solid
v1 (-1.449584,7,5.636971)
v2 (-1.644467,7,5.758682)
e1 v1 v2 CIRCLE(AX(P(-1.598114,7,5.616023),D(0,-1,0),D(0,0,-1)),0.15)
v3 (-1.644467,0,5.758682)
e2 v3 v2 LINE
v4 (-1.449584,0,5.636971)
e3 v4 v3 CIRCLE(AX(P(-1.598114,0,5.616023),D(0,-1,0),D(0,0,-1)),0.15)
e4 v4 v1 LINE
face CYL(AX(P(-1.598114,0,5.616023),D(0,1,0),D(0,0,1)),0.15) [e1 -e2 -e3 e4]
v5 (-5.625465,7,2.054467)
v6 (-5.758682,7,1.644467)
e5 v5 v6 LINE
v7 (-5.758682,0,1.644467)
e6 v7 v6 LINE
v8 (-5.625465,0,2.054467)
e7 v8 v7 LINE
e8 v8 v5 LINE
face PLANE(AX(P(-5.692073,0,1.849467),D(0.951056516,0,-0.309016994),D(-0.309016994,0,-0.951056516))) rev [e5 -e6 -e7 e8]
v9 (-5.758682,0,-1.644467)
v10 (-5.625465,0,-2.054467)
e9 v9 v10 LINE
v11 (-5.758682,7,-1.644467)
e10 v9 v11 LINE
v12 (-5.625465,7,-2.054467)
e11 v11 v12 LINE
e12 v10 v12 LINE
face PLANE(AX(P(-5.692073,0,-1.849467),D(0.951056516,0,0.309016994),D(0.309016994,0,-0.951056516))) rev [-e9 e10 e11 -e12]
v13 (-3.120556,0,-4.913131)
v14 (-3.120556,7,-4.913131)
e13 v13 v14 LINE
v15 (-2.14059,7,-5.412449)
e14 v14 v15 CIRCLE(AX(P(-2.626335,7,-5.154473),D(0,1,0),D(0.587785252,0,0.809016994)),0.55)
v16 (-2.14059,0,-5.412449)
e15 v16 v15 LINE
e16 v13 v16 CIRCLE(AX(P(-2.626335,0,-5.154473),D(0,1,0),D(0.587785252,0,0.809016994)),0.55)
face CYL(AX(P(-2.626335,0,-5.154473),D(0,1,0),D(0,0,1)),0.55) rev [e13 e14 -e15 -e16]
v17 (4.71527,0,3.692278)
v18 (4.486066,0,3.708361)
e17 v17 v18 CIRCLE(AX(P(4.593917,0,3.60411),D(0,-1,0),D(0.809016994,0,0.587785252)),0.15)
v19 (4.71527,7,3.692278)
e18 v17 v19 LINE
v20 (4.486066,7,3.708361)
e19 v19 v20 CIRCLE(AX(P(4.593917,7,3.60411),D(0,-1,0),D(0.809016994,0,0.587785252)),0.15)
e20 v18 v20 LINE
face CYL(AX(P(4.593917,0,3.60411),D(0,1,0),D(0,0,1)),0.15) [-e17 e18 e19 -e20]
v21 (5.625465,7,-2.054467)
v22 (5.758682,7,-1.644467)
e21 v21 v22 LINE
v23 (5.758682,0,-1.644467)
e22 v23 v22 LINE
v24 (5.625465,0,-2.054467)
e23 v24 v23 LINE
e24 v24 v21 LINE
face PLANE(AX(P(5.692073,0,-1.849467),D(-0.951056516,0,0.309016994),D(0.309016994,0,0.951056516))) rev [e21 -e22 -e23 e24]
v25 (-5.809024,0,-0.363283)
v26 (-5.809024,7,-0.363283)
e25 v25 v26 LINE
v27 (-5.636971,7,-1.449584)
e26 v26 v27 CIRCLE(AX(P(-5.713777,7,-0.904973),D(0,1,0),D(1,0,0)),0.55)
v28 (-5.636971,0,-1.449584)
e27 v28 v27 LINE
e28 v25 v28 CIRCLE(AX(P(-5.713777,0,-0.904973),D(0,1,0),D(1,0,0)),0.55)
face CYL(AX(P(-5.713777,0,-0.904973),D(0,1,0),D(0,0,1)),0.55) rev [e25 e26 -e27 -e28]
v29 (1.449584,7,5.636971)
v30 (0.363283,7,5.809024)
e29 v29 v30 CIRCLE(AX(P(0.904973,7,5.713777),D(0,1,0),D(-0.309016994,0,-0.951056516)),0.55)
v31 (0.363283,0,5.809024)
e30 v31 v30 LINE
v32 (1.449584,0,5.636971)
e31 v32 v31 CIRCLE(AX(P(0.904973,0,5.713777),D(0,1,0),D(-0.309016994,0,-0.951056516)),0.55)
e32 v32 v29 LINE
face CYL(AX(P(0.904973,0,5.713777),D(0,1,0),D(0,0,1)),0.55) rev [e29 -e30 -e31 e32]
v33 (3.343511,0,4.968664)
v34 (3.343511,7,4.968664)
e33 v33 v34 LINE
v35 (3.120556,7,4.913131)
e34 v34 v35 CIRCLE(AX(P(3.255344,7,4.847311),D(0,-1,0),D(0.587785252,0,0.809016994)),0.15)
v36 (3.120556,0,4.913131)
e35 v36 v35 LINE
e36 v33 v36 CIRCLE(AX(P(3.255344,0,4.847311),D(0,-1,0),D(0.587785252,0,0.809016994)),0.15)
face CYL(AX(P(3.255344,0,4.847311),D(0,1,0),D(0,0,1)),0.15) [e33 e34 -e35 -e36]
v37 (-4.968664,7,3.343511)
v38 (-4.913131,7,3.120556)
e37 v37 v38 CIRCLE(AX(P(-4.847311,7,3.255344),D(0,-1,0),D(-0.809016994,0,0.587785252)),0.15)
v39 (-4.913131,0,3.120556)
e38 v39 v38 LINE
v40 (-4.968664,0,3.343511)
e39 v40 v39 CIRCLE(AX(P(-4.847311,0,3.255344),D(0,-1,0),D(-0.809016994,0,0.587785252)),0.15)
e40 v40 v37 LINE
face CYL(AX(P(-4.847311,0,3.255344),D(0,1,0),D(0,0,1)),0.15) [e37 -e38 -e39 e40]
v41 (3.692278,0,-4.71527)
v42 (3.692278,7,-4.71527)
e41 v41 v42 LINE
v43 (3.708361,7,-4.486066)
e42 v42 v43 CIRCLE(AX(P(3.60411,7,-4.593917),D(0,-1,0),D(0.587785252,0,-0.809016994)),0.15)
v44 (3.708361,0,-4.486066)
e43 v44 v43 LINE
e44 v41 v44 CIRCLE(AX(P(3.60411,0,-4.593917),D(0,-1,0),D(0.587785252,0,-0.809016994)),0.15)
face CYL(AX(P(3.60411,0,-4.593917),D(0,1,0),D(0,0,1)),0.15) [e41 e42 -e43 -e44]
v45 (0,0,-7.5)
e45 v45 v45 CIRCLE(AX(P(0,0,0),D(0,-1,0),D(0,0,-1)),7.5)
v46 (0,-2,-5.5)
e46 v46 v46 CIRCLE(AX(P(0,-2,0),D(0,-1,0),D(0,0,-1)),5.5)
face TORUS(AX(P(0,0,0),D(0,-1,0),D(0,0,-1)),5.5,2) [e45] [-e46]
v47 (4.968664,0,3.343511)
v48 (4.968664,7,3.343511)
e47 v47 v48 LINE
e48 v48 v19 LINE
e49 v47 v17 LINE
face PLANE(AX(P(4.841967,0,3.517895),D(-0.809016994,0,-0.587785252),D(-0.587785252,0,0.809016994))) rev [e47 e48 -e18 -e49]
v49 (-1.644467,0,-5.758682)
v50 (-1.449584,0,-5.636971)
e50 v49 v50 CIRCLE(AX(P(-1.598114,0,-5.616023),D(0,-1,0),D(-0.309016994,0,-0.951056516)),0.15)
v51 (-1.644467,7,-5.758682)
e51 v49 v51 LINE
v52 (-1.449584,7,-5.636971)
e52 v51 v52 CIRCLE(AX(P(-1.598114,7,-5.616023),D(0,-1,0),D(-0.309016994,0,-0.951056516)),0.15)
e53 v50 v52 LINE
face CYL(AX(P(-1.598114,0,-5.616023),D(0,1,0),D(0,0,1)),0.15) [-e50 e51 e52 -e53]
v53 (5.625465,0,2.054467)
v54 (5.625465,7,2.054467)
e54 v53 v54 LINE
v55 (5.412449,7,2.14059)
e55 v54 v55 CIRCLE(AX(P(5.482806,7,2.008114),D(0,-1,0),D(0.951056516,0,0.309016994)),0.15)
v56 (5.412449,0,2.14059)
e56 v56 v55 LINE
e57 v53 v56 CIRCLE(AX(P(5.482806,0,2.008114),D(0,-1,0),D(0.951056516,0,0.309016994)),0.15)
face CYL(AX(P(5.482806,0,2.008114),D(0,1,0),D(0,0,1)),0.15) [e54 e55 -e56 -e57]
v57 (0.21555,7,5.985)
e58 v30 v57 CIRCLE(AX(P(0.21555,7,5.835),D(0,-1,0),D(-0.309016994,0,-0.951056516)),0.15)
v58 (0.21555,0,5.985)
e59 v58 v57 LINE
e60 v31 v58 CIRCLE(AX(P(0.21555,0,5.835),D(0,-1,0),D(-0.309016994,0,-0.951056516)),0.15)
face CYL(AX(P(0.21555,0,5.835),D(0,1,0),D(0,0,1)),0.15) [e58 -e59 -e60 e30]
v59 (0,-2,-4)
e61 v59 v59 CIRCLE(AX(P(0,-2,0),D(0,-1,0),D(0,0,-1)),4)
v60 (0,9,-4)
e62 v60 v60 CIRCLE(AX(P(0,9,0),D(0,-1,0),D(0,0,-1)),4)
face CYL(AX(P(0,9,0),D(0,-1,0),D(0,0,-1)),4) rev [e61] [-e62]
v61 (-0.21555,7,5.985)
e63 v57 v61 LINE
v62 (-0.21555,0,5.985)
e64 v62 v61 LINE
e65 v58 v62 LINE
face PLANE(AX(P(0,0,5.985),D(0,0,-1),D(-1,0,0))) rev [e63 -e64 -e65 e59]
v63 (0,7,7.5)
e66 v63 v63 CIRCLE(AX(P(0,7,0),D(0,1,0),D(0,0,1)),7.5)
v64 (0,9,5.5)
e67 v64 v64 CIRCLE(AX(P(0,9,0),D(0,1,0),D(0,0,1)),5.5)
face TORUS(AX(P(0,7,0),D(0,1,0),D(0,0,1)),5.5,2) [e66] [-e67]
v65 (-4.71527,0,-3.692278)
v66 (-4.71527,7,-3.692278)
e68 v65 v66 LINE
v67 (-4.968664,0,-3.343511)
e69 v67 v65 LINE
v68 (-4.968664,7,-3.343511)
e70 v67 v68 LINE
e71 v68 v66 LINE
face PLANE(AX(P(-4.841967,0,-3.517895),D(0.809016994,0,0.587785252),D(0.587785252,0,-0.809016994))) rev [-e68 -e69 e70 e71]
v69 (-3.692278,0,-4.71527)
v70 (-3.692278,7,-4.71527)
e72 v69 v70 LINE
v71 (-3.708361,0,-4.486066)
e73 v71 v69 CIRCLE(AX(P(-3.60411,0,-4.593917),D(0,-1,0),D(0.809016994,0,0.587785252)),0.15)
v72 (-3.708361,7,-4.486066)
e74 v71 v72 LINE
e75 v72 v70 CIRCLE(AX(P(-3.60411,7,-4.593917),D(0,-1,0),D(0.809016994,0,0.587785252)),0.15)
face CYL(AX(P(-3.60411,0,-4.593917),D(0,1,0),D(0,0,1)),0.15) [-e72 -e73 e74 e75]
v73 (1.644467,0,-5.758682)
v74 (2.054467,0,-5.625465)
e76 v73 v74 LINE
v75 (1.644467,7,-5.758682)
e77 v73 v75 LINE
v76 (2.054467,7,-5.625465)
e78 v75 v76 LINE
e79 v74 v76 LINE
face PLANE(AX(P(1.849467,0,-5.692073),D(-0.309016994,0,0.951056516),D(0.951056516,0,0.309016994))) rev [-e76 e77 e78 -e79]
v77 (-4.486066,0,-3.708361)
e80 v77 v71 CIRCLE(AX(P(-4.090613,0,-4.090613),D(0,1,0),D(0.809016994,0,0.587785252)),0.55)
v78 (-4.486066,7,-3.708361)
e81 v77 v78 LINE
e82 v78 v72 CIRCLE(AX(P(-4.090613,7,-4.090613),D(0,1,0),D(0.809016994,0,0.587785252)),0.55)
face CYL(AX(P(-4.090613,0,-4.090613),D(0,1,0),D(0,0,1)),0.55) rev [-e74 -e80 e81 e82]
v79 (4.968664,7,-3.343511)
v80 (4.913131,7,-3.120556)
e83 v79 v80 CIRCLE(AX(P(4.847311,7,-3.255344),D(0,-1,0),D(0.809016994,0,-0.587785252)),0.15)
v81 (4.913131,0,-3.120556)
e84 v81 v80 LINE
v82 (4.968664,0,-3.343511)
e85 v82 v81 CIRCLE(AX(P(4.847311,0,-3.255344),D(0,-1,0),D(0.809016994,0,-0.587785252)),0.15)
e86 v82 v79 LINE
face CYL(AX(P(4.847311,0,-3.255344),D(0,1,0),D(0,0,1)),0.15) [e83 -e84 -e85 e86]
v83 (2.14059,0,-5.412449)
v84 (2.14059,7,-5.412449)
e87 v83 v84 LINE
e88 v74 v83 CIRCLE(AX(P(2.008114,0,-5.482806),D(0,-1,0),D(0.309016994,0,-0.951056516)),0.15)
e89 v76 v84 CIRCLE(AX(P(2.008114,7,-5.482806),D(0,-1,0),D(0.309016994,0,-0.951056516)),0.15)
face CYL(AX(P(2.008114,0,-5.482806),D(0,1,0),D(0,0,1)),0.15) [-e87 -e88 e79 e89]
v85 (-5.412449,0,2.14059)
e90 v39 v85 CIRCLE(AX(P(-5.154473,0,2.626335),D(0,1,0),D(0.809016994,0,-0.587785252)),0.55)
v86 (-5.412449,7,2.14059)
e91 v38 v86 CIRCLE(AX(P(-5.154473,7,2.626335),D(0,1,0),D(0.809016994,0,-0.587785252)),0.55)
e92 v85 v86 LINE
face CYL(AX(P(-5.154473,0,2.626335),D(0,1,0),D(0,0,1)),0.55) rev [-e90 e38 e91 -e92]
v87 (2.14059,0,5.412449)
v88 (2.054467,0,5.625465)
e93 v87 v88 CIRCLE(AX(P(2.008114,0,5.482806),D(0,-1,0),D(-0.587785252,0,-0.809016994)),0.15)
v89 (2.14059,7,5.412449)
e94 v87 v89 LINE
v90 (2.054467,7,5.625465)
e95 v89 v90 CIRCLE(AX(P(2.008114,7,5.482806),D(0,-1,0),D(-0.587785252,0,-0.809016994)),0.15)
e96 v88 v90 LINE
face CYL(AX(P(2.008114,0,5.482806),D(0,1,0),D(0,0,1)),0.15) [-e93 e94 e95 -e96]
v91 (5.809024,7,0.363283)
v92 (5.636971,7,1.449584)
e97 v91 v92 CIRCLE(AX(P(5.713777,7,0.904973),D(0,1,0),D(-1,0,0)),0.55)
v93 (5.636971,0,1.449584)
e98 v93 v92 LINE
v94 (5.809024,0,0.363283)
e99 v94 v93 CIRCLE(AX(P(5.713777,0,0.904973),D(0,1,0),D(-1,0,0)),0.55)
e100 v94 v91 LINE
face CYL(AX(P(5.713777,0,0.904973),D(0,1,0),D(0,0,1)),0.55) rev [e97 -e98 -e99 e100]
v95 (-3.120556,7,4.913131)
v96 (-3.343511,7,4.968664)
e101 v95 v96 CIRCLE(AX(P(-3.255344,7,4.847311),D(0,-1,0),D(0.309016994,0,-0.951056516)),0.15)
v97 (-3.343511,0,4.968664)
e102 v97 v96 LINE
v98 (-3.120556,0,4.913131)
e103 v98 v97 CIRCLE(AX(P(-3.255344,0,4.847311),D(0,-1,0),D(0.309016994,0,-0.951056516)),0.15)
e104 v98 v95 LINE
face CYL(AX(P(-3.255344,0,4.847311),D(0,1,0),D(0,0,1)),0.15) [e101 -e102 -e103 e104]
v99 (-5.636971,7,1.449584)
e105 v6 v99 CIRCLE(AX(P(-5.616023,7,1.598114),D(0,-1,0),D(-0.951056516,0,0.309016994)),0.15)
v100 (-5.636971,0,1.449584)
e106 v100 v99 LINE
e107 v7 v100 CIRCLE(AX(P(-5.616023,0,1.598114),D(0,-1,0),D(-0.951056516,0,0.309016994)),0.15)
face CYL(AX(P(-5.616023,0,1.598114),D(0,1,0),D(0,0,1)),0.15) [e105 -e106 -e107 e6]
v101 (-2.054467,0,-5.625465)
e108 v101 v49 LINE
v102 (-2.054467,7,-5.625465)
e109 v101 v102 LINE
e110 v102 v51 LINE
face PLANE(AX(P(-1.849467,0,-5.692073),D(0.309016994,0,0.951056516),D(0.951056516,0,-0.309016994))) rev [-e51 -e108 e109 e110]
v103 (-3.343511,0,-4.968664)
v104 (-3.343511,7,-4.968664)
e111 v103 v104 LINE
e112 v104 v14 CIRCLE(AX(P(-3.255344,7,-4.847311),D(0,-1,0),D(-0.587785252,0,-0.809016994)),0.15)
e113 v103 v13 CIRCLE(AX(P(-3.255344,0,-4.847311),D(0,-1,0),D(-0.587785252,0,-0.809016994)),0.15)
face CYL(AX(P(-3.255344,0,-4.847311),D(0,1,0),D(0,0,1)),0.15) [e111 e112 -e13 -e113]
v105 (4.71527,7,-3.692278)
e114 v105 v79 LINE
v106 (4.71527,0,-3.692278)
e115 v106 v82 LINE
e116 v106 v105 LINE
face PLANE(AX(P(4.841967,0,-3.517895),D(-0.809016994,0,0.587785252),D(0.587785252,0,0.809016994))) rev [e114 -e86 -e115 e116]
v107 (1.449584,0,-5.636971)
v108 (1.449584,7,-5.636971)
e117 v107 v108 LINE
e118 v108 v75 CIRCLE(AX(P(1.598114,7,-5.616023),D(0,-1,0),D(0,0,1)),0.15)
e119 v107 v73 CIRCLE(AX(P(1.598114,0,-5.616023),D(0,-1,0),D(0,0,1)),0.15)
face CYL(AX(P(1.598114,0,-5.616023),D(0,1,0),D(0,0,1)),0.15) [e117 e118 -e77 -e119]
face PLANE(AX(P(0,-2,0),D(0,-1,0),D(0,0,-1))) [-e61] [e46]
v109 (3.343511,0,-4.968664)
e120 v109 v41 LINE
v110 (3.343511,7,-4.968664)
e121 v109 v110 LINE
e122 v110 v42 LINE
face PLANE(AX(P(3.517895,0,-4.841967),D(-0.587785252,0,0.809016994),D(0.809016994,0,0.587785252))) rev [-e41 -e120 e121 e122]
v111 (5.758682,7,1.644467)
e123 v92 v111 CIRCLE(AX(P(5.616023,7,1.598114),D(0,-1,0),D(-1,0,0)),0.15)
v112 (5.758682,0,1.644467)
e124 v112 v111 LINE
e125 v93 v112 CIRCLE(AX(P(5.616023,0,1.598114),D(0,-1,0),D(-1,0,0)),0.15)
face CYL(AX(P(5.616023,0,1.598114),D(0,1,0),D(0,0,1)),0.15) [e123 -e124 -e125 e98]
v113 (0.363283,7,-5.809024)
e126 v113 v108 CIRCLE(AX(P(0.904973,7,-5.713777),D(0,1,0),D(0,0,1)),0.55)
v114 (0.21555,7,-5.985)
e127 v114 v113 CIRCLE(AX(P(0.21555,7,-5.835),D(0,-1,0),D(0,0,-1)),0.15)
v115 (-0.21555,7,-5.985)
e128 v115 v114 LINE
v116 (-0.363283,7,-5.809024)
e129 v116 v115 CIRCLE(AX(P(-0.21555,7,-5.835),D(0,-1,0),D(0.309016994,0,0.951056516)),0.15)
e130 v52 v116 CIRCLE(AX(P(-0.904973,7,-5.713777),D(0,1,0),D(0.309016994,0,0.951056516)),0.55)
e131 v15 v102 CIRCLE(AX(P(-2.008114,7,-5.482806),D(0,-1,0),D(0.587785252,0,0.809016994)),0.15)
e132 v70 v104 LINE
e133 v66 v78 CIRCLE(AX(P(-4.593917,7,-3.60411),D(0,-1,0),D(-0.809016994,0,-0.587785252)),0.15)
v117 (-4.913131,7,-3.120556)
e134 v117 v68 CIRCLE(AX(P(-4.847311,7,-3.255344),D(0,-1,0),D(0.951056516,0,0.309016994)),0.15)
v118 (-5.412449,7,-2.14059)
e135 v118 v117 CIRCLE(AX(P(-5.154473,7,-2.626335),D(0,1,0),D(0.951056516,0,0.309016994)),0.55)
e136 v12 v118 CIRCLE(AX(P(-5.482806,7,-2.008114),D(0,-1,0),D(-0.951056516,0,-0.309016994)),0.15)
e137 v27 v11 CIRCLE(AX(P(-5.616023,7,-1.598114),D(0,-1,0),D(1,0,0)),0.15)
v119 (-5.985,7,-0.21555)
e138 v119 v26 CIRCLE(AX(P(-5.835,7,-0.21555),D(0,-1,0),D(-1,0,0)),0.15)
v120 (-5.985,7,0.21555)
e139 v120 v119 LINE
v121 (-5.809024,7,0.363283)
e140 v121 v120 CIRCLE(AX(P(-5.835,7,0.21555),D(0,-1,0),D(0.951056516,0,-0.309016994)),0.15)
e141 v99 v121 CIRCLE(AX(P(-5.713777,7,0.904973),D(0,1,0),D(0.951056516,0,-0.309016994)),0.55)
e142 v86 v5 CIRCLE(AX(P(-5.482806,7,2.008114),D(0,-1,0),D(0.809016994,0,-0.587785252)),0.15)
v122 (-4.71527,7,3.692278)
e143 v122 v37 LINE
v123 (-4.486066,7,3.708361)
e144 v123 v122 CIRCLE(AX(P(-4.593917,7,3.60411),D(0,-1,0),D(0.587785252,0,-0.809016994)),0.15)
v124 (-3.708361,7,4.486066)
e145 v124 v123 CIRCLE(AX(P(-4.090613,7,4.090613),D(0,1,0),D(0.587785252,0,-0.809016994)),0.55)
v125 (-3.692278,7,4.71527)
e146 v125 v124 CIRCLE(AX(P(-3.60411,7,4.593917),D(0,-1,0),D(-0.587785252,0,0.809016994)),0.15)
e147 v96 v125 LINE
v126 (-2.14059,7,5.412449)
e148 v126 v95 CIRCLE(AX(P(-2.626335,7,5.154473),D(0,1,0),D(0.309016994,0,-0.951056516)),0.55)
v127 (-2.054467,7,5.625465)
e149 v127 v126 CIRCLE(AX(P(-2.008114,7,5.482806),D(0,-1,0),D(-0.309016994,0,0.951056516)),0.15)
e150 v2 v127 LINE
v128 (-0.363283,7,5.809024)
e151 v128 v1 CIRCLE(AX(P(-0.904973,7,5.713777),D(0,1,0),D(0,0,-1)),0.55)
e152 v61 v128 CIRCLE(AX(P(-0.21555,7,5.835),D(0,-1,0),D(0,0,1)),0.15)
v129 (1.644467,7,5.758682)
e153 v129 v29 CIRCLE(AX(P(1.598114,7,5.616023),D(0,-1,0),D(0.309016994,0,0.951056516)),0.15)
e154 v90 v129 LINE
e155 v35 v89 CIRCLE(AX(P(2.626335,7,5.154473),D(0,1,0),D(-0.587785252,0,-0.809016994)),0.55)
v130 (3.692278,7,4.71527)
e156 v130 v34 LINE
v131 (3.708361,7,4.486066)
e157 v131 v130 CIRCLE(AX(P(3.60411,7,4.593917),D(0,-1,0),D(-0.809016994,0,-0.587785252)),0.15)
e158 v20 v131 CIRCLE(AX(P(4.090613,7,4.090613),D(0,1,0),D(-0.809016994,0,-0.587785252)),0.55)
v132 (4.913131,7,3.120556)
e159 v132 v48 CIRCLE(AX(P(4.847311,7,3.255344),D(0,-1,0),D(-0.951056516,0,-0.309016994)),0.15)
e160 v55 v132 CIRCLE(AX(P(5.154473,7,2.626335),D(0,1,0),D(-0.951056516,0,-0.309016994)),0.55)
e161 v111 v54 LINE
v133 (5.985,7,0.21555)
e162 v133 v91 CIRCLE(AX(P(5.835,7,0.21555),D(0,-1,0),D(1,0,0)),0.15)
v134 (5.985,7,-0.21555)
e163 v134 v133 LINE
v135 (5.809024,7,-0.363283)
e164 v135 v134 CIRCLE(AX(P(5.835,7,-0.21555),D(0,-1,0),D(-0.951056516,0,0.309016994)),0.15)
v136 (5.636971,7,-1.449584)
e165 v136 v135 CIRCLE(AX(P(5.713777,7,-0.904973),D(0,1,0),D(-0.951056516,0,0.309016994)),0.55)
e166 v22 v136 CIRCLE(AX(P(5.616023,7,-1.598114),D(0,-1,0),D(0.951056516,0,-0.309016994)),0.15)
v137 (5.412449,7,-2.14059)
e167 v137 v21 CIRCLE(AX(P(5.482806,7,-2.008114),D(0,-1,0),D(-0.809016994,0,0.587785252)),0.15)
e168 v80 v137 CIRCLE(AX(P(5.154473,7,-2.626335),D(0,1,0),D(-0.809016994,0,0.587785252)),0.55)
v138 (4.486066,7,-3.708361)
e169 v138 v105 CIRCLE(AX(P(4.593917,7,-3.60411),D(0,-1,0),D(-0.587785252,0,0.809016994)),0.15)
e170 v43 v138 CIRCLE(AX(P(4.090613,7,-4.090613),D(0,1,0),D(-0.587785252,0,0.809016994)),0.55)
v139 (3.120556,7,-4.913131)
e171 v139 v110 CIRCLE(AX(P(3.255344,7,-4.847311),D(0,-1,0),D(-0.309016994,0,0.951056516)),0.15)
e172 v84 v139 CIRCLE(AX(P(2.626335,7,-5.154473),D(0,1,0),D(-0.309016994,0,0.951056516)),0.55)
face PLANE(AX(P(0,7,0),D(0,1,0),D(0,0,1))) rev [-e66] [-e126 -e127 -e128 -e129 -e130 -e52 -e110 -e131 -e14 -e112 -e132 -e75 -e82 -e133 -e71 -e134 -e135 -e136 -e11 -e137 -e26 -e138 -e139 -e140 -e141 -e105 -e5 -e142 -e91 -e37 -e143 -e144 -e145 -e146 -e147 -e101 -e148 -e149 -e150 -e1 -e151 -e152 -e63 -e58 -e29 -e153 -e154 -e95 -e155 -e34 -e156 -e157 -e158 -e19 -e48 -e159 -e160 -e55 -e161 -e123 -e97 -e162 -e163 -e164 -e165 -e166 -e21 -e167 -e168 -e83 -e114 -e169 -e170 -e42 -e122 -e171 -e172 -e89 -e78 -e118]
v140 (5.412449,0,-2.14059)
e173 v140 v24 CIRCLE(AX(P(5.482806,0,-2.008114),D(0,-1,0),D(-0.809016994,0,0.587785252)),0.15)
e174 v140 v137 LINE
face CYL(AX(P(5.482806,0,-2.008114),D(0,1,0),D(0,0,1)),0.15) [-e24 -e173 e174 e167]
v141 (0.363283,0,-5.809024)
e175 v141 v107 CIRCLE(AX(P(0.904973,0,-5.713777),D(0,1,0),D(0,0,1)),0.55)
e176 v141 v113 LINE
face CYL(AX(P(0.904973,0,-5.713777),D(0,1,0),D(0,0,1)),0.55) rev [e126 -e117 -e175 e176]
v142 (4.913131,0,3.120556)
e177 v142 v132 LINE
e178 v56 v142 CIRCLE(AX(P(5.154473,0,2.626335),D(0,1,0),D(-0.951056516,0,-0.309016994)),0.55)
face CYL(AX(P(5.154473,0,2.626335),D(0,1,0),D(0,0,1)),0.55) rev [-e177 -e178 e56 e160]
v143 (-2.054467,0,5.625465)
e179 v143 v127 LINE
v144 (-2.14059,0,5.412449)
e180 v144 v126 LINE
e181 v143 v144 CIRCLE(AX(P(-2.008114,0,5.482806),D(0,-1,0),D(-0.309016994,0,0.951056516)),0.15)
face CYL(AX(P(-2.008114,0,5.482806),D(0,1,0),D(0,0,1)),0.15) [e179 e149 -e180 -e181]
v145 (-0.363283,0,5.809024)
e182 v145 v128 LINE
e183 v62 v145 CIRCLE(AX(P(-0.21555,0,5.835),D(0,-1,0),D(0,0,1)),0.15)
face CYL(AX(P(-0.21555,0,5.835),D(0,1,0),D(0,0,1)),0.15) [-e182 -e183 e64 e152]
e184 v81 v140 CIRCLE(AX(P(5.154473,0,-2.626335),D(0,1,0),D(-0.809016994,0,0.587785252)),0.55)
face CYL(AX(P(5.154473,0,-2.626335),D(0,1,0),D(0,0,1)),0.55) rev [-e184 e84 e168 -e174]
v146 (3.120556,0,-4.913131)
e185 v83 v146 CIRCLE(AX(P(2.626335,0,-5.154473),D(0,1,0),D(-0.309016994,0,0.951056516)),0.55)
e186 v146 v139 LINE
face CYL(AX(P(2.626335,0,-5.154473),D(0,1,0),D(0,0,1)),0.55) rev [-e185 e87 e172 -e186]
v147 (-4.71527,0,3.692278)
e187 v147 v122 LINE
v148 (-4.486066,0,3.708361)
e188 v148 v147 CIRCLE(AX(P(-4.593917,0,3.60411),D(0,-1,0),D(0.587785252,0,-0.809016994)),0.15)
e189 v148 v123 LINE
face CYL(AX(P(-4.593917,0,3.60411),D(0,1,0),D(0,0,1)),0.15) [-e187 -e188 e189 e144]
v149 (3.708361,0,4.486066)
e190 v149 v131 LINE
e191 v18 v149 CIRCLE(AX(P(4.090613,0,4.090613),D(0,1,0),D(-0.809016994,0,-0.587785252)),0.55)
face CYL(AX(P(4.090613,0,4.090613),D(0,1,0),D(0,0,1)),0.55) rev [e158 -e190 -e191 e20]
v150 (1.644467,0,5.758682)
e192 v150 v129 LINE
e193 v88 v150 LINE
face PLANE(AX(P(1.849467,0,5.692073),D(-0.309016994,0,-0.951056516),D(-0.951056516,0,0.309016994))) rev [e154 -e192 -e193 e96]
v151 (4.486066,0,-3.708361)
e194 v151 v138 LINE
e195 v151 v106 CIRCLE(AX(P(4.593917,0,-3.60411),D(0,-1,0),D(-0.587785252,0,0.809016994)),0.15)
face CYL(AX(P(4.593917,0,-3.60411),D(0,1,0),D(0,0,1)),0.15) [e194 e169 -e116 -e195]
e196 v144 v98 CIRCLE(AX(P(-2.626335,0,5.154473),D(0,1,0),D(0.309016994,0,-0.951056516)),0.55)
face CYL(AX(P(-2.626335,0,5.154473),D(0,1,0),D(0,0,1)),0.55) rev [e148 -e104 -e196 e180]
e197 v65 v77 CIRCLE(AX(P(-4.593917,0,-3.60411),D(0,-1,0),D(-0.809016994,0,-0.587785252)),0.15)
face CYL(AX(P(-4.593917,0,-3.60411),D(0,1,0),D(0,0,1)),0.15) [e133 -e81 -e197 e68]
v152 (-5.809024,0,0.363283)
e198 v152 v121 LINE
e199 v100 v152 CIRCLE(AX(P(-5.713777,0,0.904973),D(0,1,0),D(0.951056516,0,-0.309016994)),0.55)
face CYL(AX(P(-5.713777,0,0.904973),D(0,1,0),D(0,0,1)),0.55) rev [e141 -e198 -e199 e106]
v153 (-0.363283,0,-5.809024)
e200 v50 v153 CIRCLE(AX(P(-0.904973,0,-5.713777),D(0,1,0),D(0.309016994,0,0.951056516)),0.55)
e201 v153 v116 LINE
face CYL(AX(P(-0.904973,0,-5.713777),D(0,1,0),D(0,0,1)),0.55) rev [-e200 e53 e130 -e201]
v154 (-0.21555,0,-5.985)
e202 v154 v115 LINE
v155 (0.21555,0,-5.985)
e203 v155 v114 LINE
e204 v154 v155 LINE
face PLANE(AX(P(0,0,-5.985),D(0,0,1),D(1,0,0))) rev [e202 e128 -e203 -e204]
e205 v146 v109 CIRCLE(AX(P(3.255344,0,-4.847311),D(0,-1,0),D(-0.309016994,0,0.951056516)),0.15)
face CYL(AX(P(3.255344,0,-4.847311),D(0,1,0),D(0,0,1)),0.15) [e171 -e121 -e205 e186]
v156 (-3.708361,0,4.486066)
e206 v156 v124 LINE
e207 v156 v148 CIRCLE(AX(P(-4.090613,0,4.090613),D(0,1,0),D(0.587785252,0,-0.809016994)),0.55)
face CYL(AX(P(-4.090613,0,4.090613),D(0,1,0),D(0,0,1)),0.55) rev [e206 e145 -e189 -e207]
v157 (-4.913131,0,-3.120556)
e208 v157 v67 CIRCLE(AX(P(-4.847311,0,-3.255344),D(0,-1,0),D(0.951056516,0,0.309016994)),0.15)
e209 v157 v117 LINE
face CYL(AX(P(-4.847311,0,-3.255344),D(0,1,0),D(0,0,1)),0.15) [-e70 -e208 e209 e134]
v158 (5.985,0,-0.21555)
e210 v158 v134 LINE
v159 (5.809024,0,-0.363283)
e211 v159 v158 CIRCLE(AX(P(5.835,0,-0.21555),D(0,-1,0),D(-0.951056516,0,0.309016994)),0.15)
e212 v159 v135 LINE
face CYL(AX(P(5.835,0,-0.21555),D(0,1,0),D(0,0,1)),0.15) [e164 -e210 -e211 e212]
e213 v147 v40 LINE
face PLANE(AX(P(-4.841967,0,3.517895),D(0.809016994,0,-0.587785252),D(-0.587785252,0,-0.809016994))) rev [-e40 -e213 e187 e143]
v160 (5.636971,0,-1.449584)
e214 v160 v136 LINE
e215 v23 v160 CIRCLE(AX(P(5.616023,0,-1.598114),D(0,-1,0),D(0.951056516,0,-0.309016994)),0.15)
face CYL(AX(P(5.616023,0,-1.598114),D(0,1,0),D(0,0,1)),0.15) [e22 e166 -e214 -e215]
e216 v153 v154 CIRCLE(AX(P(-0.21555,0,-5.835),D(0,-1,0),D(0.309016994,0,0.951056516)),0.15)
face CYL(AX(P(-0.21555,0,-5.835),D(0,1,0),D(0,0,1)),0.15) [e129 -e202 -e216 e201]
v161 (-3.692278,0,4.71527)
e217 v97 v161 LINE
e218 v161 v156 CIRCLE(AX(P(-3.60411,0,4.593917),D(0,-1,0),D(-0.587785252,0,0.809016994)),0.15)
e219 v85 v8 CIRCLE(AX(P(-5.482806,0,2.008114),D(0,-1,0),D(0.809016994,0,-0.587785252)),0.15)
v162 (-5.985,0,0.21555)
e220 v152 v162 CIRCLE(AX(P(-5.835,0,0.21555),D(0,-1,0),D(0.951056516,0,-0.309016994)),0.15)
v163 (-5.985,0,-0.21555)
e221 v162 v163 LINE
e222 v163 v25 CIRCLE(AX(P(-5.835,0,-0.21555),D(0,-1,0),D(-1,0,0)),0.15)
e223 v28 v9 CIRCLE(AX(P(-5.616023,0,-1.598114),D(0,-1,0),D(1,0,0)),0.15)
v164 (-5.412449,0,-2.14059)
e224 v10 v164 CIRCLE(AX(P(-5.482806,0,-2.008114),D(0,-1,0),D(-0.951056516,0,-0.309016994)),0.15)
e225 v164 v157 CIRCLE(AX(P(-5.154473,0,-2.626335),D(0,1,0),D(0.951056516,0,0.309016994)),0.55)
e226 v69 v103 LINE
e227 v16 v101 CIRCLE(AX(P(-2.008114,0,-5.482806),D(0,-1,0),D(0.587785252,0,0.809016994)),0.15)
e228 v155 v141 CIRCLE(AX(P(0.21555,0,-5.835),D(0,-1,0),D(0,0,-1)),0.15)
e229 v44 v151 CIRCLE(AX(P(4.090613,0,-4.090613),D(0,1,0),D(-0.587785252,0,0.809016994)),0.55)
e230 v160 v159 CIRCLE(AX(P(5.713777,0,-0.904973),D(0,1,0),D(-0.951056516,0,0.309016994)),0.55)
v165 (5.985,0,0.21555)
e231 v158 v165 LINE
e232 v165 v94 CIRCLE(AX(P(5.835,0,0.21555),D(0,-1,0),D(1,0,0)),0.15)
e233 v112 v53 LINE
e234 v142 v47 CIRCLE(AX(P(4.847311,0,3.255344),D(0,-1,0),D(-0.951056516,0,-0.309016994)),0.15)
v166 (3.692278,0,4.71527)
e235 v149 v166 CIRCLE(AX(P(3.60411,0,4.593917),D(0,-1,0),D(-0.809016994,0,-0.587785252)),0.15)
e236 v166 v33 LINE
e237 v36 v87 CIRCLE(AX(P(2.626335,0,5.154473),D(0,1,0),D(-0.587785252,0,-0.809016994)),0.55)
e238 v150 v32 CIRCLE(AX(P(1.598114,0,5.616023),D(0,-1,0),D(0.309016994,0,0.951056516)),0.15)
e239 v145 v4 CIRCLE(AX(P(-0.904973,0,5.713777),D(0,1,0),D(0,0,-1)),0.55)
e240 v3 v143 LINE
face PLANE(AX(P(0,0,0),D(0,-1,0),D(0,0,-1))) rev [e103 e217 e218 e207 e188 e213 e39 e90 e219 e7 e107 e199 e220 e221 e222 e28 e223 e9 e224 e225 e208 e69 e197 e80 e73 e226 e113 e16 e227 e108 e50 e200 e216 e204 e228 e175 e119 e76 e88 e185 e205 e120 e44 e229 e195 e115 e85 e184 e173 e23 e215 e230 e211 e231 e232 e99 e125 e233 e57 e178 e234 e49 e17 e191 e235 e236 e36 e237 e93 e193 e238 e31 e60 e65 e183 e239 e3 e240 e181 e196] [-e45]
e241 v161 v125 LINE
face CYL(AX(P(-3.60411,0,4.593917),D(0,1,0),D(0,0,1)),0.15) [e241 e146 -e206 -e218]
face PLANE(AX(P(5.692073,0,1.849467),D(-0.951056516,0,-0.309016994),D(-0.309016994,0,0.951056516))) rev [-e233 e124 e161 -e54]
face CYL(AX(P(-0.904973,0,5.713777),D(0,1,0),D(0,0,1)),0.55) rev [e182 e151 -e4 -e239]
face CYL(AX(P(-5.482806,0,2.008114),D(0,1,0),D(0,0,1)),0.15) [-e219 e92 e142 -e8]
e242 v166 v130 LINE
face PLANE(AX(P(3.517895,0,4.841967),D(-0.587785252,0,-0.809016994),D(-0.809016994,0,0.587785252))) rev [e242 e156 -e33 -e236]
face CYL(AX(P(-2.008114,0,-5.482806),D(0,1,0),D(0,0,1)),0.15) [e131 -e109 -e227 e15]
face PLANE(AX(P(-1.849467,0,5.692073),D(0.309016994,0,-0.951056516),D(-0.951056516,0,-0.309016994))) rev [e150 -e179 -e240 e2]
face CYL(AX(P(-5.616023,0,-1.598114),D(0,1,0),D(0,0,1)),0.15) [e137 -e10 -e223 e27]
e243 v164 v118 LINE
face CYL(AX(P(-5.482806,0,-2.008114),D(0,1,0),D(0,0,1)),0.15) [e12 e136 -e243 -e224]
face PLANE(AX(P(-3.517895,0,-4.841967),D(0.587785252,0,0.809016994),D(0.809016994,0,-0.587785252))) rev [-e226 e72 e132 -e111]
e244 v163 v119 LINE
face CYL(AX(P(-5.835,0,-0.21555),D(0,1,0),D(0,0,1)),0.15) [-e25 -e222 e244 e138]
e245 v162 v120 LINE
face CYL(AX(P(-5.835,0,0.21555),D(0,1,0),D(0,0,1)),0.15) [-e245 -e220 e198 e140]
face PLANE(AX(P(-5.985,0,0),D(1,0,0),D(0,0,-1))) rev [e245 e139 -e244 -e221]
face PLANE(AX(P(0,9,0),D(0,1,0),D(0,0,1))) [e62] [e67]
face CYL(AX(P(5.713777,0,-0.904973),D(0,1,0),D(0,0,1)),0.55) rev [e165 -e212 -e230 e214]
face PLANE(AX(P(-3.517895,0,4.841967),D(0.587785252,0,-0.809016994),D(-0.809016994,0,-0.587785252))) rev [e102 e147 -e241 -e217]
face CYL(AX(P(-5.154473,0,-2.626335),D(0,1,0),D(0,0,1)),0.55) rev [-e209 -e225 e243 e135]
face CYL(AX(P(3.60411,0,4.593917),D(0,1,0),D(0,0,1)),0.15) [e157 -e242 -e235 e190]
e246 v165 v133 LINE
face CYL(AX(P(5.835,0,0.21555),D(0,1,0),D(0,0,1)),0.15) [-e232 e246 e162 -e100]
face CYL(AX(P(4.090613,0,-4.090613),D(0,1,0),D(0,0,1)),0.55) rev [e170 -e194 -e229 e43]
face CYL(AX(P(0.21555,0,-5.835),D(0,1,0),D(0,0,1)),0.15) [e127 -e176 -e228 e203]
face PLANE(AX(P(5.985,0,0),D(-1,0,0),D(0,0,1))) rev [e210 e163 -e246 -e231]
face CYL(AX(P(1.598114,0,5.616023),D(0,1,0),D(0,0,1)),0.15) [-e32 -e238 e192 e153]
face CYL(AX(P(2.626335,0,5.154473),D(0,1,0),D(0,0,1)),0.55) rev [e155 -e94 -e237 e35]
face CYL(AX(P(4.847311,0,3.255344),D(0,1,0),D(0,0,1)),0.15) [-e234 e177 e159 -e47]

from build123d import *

# Parameters (mm, degrees)
SKETCH1_R           = 6.365
BOSS_EXTRUDE2_DEPTH = 7
CUT_EXTRUDE1_DEPTH  = 7
CIRPATTERN1_COUNT   = 20
SKETCH3_R           = 7.5
BOSS_EXTRUDE3_DEPTH = 2
FILLET1_R           = 2
BOSS_EXTRUDE4_START = 2
SKETCH4_R           = 7.5
BOSS_EXTRUDE4_DEPTH = 2
FILLET2_R           = 2
SKETCH5_R           = 4
CUT_EXTRUDE2_DEPTH  = 16.280706888


with BuildPart() as part:
    # Sketch1 → Boss-Extrude2 (new body)
    with BuildSketch(Plane(origin=(0, 0, 0), x_dir=(1, 0, 0), z_dir=(0, 1, 0))):
        with Locations(Location((0, 0, 0), (0, 0, 270))):
            Circle(SKETCH1_R)
    extrude(amount=BOSS_EXTRUDE2_DEPTH)

    # Sketch2 → Cut-Extrude1 (cut)
    with BuildSketch(Plane(origin=(0, 7, 0), x_dir=(1, 0, 0), z_dir=(0, 1, 0))):
        with BuildLine():
            Line((0, 5.985), (0.21554971, 5.985))
            ThreePointArc((0.21554971, 5.985), (0.330433243, 5.931445705), (0.363283354, 5.809023654))
            ThreePointArc((0.363283354, 5.809023654), (0.818934424, 5.170548463), (1.449584029, 5.636970529))
            ThreePointArc((1.449584029, 5.636970529), (1.518656835, 5.743249576), (1.644466755, 5.758681774))
            Line((1.644466755, 5.758681774), (1.849466711, 5.69207325))
            Line((1.849466711, 5.69207325), (1.966893169, 6.053474726))
            Line((1.966893169, 6.053474726), (1.188040248, 6.306539381))
            Line((1.188040248, 6.306539381), (0.818934424, 6.365))
            Line((0.818934424, 6.365), (0, 6.365))
            Line((0, 6.365), (0, 5.985))
        make_face()
    cut_extrude1 = extrude(amount=-CUT_EXTRUDE1_DEPTH, mode=Mode.SUBTRACT)

    # CirPattern1: Cut-Extrude1 ×20 about axis
    cirpattern1_axis = Axis((0, 0, 0), (0, 1, 0))
    for i in range(1, CIRPATTERN1_COUNT):
        add(cut_extrude1.rotate(cirpattern1_axis, i * 360 / CIRPATTERN1_COUNT), mode=Mode.SUBTRACT)

    # Sketch3 → Boss-Extrude3 (add)
    with BuildSketch(Plane(origin=(0, 7, 0), x_dir=(1, 0, 0), z_dir=(0, 1, 0))):
        with Locations(Location((0, 0, 0), (0, 0, 270))):
            Circle(SKETCH3_R)
    extrude(amount=BOSS_EXTRUDE3_DEPTH)

    # Fillet1
    fillet1_edges = [part.edges().sort_by_distance(p)[0] for p in [
        (0, 9, -7.5),
    ]]
    fillet(fillet1_edges, radius=FILLET1_R - 0.0001)  # a hair under: the kernel refuses the full size

    # Sketch4 → Boss-Extrude4 (add)
    with BuildSketch(Plane.XZ.offset(BOSS_EXTRUDE4_START)):
        with Locations(Location((0, 0, 0), (0, 0, 270))):
            Circle(SKETCH4_R)
    extrude(amount=-BOSS_EXTRUDE4_DEPTH)

    # Fillet2
    fillet2_edges = [part.edges().sort_by_distance(p)[0] for p in [
        (0, -2, 7.5),
    ]]
    fillet(fillet2_edges, radius=FILLET2_R - 0.0001)  # a hair under: the kernel refuses the full size

    # Sketch5 → Cut-Extrude2 (cut, through all)
    with BuildSketch(Plane.XZ.offset(2)):
        with Locations(Location((0, 0, 0), (0, 0, 270))):
            Circle(SKETCH5_R)
    extrude(amount=-CUT_EXTRUDE2_DEPTH, mode=Mode.SUBTRACT)


solid = part.part
